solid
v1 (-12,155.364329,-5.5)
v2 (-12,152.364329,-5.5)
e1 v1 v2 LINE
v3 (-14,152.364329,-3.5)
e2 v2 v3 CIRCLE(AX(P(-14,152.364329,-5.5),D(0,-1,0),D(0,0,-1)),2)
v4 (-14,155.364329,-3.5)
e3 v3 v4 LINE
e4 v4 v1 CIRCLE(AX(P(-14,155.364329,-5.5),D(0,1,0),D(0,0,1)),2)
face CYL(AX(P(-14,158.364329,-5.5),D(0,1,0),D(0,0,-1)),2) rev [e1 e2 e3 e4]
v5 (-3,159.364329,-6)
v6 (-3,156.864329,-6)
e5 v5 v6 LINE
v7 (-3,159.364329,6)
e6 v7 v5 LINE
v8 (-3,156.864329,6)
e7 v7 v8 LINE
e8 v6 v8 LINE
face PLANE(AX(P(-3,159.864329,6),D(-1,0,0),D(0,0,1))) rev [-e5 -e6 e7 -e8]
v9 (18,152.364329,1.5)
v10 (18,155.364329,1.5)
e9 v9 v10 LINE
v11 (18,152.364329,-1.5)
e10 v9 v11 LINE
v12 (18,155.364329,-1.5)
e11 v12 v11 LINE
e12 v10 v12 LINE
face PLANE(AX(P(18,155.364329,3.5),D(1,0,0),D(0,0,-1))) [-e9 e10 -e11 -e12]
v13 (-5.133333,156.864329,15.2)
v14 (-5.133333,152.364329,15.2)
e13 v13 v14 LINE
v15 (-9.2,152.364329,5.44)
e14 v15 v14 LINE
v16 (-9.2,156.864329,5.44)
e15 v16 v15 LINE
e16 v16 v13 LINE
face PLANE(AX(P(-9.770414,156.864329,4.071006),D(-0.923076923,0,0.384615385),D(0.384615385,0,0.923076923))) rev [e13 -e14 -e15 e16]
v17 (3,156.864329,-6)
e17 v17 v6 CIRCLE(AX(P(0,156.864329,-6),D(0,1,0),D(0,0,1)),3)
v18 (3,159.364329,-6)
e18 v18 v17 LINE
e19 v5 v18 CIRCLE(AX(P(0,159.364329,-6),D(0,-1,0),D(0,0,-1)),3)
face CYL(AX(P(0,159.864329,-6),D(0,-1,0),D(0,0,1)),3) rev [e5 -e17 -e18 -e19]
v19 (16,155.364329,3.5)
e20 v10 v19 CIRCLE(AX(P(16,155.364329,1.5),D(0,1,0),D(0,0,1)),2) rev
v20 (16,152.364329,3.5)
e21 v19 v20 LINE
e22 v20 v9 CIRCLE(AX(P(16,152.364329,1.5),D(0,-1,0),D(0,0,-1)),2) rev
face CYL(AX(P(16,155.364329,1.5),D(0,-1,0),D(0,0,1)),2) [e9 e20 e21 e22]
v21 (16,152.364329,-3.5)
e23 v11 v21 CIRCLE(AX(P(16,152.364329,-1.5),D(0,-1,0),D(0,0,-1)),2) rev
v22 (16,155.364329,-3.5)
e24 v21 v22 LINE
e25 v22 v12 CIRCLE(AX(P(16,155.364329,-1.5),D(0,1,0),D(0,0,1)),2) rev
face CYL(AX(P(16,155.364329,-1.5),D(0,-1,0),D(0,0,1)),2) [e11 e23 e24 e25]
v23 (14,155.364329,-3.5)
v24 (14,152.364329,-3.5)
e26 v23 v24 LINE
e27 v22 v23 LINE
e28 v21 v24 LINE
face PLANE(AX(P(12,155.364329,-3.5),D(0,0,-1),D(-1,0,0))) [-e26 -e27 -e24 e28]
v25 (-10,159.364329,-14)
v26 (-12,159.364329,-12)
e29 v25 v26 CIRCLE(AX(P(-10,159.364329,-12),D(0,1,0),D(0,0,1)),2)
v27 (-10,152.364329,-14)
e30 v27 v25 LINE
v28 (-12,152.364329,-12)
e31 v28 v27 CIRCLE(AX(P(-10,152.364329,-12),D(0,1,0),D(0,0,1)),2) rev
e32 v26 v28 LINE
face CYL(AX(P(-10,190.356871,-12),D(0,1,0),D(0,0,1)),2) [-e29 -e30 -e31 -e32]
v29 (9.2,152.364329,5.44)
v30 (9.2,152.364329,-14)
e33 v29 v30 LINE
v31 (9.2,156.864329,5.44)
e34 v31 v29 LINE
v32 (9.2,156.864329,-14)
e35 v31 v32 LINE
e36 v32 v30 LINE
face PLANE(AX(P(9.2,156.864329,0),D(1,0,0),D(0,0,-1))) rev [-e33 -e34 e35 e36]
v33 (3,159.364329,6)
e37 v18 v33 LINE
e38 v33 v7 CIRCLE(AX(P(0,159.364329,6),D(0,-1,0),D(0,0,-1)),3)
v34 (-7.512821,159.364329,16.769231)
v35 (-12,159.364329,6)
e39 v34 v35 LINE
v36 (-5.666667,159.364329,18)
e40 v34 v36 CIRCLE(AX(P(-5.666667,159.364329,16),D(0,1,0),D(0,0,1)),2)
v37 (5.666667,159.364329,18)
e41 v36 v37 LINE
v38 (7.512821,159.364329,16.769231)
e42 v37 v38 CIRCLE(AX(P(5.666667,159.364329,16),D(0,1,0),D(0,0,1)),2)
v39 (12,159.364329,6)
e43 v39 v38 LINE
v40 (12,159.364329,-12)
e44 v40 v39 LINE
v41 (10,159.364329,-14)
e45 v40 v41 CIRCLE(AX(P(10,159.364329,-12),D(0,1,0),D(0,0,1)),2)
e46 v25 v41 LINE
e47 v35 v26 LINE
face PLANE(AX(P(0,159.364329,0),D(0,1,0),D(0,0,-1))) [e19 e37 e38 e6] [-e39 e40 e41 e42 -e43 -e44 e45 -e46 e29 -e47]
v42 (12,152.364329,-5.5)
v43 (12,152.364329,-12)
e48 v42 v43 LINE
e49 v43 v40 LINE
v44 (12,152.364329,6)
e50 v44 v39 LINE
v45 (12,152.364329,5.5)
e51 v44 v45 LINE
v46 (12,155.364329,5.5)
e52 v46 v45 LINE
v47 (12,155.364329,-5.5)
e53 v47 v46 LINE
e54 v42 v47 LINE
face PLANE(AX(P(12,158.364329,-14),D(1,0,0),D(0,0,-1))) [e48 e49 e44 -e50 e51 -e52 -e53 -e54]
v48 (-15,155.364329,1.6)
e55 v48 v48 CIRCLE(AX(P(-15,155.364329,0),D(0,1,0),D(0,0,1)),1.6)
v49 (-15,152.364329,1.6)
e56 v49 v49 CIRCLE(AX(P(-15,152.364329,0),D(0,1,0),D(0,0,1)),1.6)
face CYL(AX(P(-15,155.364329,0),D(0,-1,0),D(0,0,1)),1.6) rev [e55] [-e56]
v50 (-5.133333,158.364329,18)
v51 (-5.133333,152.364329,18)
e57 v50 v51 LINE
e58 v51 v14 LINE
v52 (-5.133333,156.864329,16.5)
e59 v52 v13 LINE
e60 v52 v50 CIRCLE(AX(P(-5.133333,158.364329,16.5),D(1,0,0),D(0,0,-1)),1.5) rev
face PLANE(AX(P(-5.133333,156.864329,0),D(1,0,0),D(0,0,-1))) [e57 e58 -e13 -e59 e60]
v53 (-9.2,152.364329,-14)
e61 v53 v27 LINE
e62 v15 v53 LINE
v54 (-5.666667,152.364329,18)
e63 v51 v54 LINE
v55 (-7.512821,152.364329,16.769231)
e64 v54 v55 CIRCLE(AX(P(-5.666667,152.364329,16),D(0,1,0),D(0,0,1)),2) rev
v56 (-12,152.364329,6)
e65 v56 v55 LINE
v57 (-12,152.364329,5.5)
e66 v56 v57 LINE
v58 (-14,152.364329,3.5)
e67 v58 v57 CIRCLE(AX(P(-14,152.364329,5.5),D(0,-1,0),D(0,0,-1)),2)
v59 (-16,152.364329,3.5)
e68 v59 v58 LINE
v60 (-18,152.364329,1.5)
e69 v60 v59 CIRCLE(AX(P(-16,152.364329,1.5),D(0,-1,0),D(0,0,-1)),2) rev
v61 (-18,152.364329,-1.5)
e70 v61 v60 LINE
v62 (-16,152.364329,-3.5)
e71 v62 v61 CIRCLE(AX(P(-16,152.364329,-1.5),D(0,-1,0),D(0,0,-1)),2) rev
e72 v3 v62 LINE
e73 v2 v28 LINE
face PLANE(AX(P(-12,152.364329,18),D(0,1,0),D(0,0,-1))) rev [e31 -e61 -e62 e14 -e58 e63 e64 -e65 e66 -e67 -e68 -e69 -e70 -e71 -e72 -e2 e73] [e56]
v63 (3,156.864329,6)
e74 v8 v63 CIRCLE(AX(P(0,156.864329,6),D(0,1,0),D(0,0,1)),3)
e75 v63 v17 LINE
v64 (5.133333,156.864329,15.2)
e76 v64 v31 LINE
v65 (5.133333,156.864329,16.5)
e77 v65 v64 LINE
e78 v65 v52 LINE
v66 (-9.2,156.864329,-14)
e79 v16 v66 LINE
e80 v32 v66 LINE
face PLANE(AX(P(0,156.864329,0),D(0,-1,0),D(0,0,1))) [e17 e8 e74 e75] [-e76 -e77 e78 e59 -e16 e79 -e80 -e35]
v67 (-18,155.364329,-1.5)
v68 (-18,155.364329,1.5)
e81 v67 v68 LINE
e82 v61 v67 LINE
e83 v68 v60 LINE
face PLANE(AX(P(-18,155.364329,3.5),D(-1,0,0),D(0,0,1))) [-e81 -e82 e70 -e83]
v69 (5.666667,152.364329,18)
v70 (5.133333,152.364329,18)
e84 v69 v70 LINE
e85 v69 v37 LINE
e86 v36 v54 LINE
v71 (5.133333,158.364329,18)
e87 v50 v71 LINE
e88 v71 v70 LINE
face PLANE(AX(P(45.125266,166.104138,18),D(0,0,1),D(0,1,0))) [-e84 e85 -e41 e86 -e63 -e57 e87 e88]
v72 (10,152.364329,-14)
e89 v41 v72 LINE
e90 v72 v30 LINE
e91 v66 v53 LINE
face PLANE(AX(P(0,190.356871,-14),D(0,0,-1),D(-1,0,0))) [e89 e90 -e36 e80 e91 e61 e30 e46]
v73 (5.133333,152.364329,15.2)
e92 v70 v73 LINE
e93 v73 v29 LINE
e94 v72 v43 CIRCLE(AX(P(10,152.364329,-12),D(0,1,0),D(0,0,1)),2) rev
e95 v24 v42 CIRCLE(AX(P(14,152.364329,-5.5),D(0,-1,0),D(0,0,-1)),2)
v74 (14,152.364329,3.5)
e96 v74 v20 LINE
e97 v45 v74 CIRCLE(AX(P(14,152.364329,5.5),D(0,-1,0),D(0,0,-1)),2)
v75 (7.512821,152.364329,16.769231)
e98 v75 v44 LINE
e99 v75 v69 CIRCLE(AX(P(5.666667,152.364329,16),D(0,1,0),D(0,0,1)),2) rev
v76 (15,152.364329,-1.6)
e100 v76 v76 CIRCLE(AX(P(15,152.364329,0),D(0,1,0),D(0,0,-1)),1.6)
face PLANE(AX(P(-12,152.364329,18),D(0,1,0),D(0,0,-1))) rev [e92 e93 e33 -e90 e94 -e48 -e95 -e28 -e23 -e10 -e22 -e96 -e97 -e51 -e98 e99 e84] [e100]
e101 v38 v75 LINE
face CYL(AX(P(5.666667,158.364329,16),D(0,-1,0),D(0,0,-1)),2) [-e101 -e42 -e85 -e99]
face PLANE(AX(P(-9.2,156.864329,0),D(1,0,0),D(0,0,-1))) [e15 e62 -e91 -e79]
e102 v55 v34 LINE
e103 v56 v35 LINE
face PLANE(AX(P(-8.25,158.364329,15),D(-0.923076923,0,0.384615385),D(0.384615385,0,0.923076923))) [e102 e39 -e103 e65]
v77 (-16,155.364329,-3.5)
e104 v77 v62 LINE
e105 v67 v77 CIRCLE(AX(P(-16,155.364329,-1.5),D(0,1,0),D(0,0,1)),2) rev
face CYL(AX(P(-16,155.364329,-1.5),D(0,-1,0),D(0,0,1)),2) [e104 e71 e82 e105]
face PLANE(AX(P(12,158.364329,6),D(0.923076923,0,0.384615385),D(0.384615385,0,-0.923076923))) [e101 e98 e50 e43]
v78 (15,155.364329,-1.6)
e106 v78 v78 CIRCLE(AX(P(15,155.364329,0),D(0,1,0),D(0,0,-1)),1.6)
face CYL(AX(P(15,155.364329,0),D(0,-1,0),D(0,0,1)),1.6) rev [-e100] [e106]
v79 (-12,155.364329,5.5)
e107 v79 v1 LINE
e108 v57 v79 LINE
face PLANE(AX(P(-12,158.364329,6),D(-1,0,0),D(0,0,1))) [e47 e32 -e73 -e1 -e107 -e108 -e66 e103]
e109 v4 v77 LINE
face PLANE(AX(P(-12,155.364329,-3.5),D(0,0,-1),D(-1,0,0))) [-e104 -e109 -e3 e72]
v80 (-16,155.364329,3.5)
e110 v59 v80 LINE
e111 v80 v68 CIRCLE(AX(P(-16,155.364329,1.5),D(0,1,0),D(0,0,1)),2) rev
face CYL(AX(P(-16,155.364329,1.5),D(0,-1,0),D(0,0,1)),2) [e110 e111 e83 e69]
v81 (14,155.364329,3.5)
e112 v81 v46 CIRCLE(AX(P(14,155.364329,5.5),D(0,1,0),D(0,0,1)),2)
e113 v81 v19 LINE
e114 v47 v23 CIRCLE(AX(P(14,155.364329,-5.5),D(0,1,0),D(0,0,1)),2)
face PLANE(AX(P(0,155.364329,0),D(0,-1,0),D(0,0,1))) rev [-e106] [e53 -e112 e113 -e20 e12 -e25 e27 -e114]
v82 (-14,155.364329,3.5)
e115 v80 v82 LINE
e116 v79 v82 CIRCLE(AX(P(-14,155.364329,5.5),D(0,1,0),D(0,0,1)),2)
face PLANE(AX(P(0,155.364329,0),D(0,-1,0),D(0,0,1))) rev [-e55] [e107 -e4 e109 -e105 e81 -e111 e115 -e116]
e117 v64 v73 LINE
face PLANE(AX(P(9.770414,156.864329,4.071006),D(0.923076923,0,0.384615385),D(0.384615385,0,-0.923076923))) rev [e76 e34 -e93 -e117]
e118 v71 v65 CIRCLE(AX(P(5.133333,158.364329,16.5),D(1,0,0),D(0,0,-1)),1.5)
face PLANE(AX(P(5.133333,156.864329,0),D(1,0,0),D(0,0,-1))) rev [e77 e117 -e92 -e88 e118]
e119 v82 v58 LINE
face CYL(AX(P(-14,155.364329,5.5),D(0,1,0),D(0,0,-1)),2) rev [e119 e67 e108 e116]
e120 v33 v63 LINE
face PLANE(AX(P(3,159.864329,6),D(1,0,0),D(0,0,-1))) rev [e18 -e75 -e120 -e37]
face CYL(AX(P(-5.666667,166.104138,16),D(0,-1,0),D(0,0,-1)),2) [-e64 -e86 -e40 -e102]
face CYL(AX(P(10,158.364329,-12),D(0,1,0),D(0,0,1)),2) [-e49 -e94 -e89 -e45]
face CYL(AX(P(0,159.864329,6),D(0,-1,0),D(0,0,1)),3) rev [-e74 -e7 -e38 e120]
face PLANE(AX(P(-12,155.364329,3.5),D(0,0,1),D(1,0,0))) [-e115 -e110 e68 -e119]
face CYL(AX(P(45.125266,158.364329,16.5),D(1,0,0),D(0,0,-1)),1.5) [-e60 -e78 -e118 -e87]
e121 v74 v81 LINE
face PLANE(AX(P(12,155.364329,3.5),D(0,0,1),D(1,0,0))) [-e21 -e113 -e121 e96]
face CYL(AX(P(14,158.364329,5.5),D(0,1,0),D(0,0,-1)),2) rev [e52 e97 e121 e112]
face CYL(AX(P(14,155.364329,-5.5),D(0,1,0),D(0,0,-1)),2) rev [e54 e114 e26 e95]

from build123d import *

# Parameters (mm, degrees)
EXTRUDE_1_DEPTH      = 3
SKETCH_7_R           = 1.75
SKETCH_7_R_2         = 2.25
CUT_EXTRUDE_2_DEPTH  = 143.955430949
CUT_EXTRUDE_4_DEPTH  = 3
CUT_EXTRUDE_5_DEPTH  = 3
CUT_EXTRUDE_8_DEPTH  = 3
SKETCH_12_R          = 1.7
CUT_EXTRUDE_9_DEPTH  = 3
SKETCH_13_R          = 1.7
CUT_EXTRUDE_11_DEPTH = 3
CUT_EXTRUDE_12_DEPTH = 143.955430949
FILLET_1_R           = 2
FILLET_2_R           = 2
CUT_EXTRUDE_13_DEPTH = 143.955430949
CUT_EXTRUDE_15_DEPTH = 143.955430949
CUT_EXTRUDE_16_DEPTH = 143.955430949
SKETCH_20_W          = 133.80338819
SKETCH_20_H          = 42.989432067
EXTRUDE_2_DEPTH      = 3
SKETCH_21_W          = 129.207272524
SKETCH_21_H          = 38.788932745
EXTRUDE_3_DEPTH      = 3
SKETCH_22_W          = 20.868569364
SKETCH_22_H          = 31.210515244
SKETCH_22_W_2        = 21.053246969
SKETCH_22_H_2        = 30.102449614
EXTRUDE_4_DEPTH      = 3
SKETCH_24_W          = 36.300662223
SKETCH_24_H          = 5.953308604
SKETCH_24_W_2        = 36.591067521
EXTRUDE_5_DEPTH      = 3
CUT_EXTRUDE_17_DEPTH = 143.955430949
CUT_EXTRUDE_19_DEPTH = 143.955430949
CUT_EXTRUDE_20_DEPTH = 143.955430949
CUT_EXTRUDE_21_DEPTH = 143.955430949
CUT_EXTRUDE_22_DEPTH = 143.955430949
CUT_EXTRUDE_23_DEPTH = 3
SKETCH_30_R          = 1.7
SKETCH_30_R_2        = 3.5
EXTRUDE_6_DEPTH      = 4
EXTRUDE_7_DEPTH      = 24
CUT_EXTRUDE_26_DEPTH = 31.5
EXTRUDE_8_DEPTH      = 10
EXTRUDE_9_DEPTH      = 1
CUT_EXTRUDE_27_DEPTH = 10
SKETCH_38_W          = 3
SKETCH_38_H          = 1
CUT_EXTRUDE_28_DEPTH = 166.273761152
CUT_EXTRUDE_29_DEPTH = 21
EXTRUDE_11_DEPTH     = 7
CUT_EXTRUDE_30_DEPTH = 5.5
EXTRUDE_12_DEPTH     = 3
CUT_EXTRUDE_31_DEPTH = 23
FILLET_4_R           = 0.7
FILLET_5_R           = 1
FILLET_6_R           = 1.2
CUT_EXTRUDE_32_DEPTH = 3
SKETCH_47_W          = 24
SKETCH_47_H          = 1
CUT_EXTRUDE_33_DEPTH = 167.672697425
SKETCH_48_W          = 6
SKETCH_48_H          = 7
SKETCH_48_R          = 1.6
EXTRUDE_13_DEPTH     = 3
FILLET_7_R           = 2
SKETCH_49_W          = 40.518885993
SKETCH_49_H          = 45.885701136
CUT_EXTRUDE_34_DEPTH = 33
FILLET_8_R           = 2
FILLET_9_R           = 2
FILLET_10_R          = 2
FILLET_11_R          = 2
FILLET_12_R          = 1.5
FILLET_13_R          = 1.5
SKETCH_51_W          = 46.608599542
SKETCH_51_H          = 55.034000229
CUT_EXTRUDE_36_DEPTH = 40


# Read off the part's stored shape, not the designer's step: 切除-拉伸35
with BuildPart() as part:
    # 草图1 → 凸台-拉伸1 (new body)
    # profile 1 of 14: a face of its own
    with BuildSketch(Plane.XY):
        with BuildLine():
            Line((60, 106.603296002), (35.889163634, 121.664519159))
            Line((35.889163634, 121.664519159), (-35.889163634, 121.664519159))
            Line((-35.889163634, 121.664519159), (-60, 106.603296002))
            Line((-60, 106.603296002), (-60, 94.801892265))
            Line((-60, 94.801892265), (-45, 94.801892265))
            ThreePointArc((-45, 94.801892265), (-43.762563133, 94.289329132), (-43.25, 93.051892265))
            Line((-43.25, 93.051892265), (-37.75, 93.051892265))
            ThreePointArc((-37.75, 93.051892265), (-37.237436867, 94.289329132), (-36, 94.801892265))
            Line((-36, 94.801892265), (-21, 94.801892265))
            ThreePointArc((-21, 94.801892265), (-19.762563133, 94.289329132), (-19.25, 93.051892265))
            Line((-19.25, 93.051892265), (19.25, 93.051892265))
            ThreePointArc((19.25, 93.051892265), (19.762563133, 94.289329132), (21, 94.801892265))
            Line((21, 94.801892265), (36, 94.801892265))
            ThreePointArc((36, 94.801892265), (37.237436867, 94.289329132), (37.75, 93.051892265))
            Line((37.75, 93.051892265), (43.25, 93.051892265))
            ThreePointArc((43.25, 93.051892265), (43.762563133, 94.289329132), (45, 94.801892265))
            Line((45, 94.801892265), (60, 94.801892265))
            Line((60, 94.801892265), (60, 106.603296002))
        make_face()
    # profile 2 of 14: a face of its own
    with BuildSketch(Plane.XY):
        with BuildLine():
            Line((66.901694095, 102.292041372), (60, 106.603296002))
            Line((60, 106.603296002), (60, 94.801892265))
            ThreePointArc((60, 94.801892265), (61.237436867, 94.289329132), (61.75, 93.051892265))
            Line((61.75, 93.051892265), (66.901694095, 93.051892265))
            Line((66.901694095, 93.051892265), (66.901694095, 102.292041372))
        make_face()
    # profile 3 of 14: a face of its own
    with BuildSketch(Plane.XY):
        with BuildLine():
            Line((-60, 94.801892265), (-60, 106.603296002))
            Line((-60, 106.603296002), (-66.901694095, 102.292041372))
            Line((-66.901694095, 102.292041372), (-66.901694095, 93.051892265))
            Line((-66.901694095, 93.051892265), (-61.75, 93.051892265))
            ThreePointArc((-61.75, 93.051892265), (-61.237436867, 94.289329132), (-60, 94.801892265))
        make_face()
    # profile 4 of 14: a face of its own
    with BuildSketch(Plane.XY):
        with BuildLine():
            Line((66.901694095, 63.051892265), (66.901694095, 93.051892265))
            Line((66.901694095, 93.051892265), (61.75, 93.051892265))
            ThreePointArc((61.75, 93.051892265), (61.237436867, 91.814455398), (60, 91.301892265))
            Line((60, 91.301892265), (60, 64.801892265))
            ThreePointArc((60, 64.801892265), (61.237436867, 64.289329132), (61.75, 63.051892265))
            Line((61.75, 63.051892265), (66.901694095, 63.051892265))
        make_face()
    # profile 5 of 14: a face of its own
    with BuildSketch(Plane.XY):
        with BuildLine():
            Line((-61.75, 93.051892265), (-66.901694095, 93.051892265))
            Line((-66.901694095, 93.051892265), (-66.901694095, 63.051892265))
            Line((-66.901694095, 63.051892265), (-61.75, 63.051892265))
            ThreePointArc((-61.75, 63.051892265), (-61.237436867, 64.289329132), (-60, 64.801892265))
            Line((-60, 64.801892265), (-60, 91.301892265))
            ThreePointArc((-60, 91.301892265), (-61.237436867, 91.814455398), (-61.75, 93.051892265))
        make_face()
    # profile 6 of 14: a face of its own
    with BuildSketch(Plane.XY):
        with BuildLine():
            Line((66.901694095, 52.870133869), (66.901694095, 63.051892265))
            Line((66.901694095, 63.051892265), (61.75, 63.051892265))
            ThreePointArc((61.75, 63.051892265), (61.237436867, 61.814455398), (60, 61.301892265))
            Line((60, 61.301892265), (60, 31.261343001))
            Line((60, 31.261343001), (75, 31.261343001))
            Line((75, 31.261343001), (75, 40.933889795))
            ThreePointArc((75, 40.933889795), (69.117351927, 45.658052319), (66.901694095, 52.870133869))
        make_face()
    # profile 7 of 14: a face of its own
    with BuildSketch(Plane.XY):
        with BuildLine():
            Line((60, 64.801892265), (60, 91.301892265))
            Line((60, 91.301892265), (45, 91.301892265))
            ThreePointArc((45, 91.301892265), (43.762563133, 91.814455398), (43.25, 93.051892265))
            Line((43.25, 93.051892265), (37.75, 93.051892265))
            ThreePointArc((37.75, 93.051892265), (37.237436867, 91.814455398), (36, 91.301892265))
            Line((36, 91.301892265), (21, 91.301892265))
            ThreePointArc((21, 91.301892265), (19.762563133, 91.814455398), (19.25, 93.051892265))
            Line((19.25, 93.051892265), (-19.25, 93.051892265))
            ThreePointArc((-19.25, 93.051892265), (-19.762563133, 91.814455398), (-21, 91.301892265))
            Line((-21, 91.301892265), (-36, 91.301892265))
            ThreePointArc((-36, 91.301892265), (-37.237436867, 91.814455398), (-37.75, 93.051892265))
            Line((-37.75, 93.051892265), (-43.25, 93.051892265))
            ThreePointArc((-43.25, 93.051892265), (-43.762563133, 91.814455398), (-45, 91.301892265))
            Line((-45, 91.301892265), (-60, 91.301892265))
            Line((-60, 91.301892265), (-60, 64.801892265))
            Line((-60, 64.801892265), (-45, 64.801892265))
            ThreePointArc((-45, 64.801892265), (-43.762563133, 64.289329132), (-43.25, 63.051892265))
            Line((-43.25, 63.051892265), (-37.75, 63.051892265))
            ThreePointArc((-37.75, 63.051892265), (-37.237436867, 64.289329132), (-36, 64.801892265))
            Line((-36, 64.801892265), (-21, 64.801892265))
            ThreePointArc((-21, 64.801892265), (-19.762563133, 64.289329132), (-19.25, 63.051892265))
            Line((-19.25, 63.051892265), (19.25, 63.051892265))
            ThreePointArc((19.25, 63.051892265), (19.762563133, 64.289329132), (21, 64.801892265))
            Line((21, 64.801892265), (36, 64.801892265))
            ThreePointArc((36, 64.801892265), (37.237436867, 64.289329132), (37.75, 63.051892265))
            Line((37.75, 63.051892265), (43.25, 63.051892265))
            ThreePointArc((43.25, 63.051892265), (43.762563133, 64.289329132), (45, 64.801892265))
            Line((45, 64.801892265), (60, 64.801892265))
        make_face()
    # profile 8 of 14: a face of its own
    with BuildSketch(Plane.XY):
        with BuildLine():
            Line((-61.75, 63.051892265), (-66.901694095, 63.051892265))
            Line((-66.901694095, 63.051892265), (-66.901694095, 52.870133869))
            ThreePointArc((-66.901694095, 52.870133869), (-69.117351927, 45.658052319), (-75, 40.933889795))
            Line((-75, 40.933889795), (-75, 31.261343001))
            Line((-75, 31.261343001), (-60, 31.261343001))
            Line((-60, 31.261343001), (-60, 61.301892265))
            ThreePointArc((-60, 61.301892265), (-61.237436867, 61.814455398), (-61.75, 63.051892265))
        make_face()
    # profile 9 of 14: a face of its own
    with BuildSketch(Plane.XY):
        with BuildLine():
            Line((60, 31.261343001), (60, 61.301892265))
            Line((60, 61.301892265), (45, 61.301892265))
            ThreePointArc((45, 61.301892265), (43.762563133, 61.814455398), (43.25, 63.051892265))
            Line((43.25, 63.051892265), (37.75, 63.051892265))
            ThreePointArc((37.75, 63.051892265), (37.237436867, 61.814455398), (36, 61.301892265))
            Line((36, 61.301892265), (21, 61.301892265))
            ThreePointArc((21, 61.301892265), (19.762563133, 61.814455398), (19.25, 63.051892265))
            Line((19.25, 63.051892265), (-19.25, 63.051892265))
            ThreePointArc((-19.25, 63.051892265), (-19.762563133, 61.814455398), (-21, 61.301892265))
            Line((-21, 61.301892265), (-36, 61.301892265))
            ThreePointArc((-36, 61.301892265), (-37.237436867, 61.814455398), (-37.75, 63.051892265))
            Line((-37.75, 63.051892265), (-43.25, 63.051892265))
            ThreePointArc((-43.25, 63.051892265), (-43.762563133, 61.814455398), (-45, 61.301892265))
            Line((-45, 61.301892265), (-60, 61.301892265))
            Line((-60, 61.301892265), (-60, 31.261343001))
            Line((-60, 31.261343001), (60, 31.261343001))
        make_face()
    # profile 10 of 14: a face of its own
    with BuildSketch(Plane.XY):
        with BuildLine():
            Line((60, -58.312864289), (60, 23.940028391))
            Line((60, 23.940028391), (-60, 23.940028391))
            Line((-60, 23.940028391), (-60, -58.312864289))
            Line((-60, -58.312864289), (-45, -58.312864289))
            ThreePointArc((-45, -58.312864289), (-43.25, -60.062864289), (-45, -61.812864289))
            Line((-45, -61.812864289), (-60, -61.812864289))
            Line((-60, -61.812864289), (-60, -88.312864289))
            Line((-60, -88.312864289), (-45, -88.312864289))
            ThreePointArc((-45, -88.312864289), (-43.25, -90.062864289), (-45, -91.812864289))
            Line((-45, -91.812864289), (-60, -91.812864289))
            Line((-60, -91.812864289), (-60, -111.849967256))
            Line((-60, -111.849967256), (-38.845469114, -105.590576733))
            ThreePointArc((-38.845469114, -105.590576733), (-36.037784492, -104.975210108), (-33.17088573, -104.768665882))
            Line((-33.17088573, -104.768665882), (33.17088573, -104.768665882))
            ThreePointArc((33.17088573, -104.768665882), (36.037784492, -104.975210108), (38.845469114, -105.590576733))
            Line((38.845469114, -105.590576733), (60, -111.849967256))
            Line((60, -111.849967256), (60, -91.812864289))
            Line((60, -91.812864289), (45, -91.812864289))
            ThreePointArc((45, -91.812864289), (43.762563133, -91.300301156), (43.25, -90.062864289))
            ThreePointArc((43.25, -90.062864289), (43.762563133, -88.825427422), (45, -88.312864289))
            Line((45, -88.312864289), (60, -88.312864289))
            Line((60, -88.312864289), (60, -61.812864289))
            Line((60, -61.812864289), (45, -61.812864289))
            ThreePointArc((45, -61.812864289), (43.762563133, -61.300301156), (43.25, -60.062864289))
            ThreePointArc((43.25, -60.062864289), (43.762563133, -58.825427422), (45, -58.312864289))
            Line((45, -58.312864289), (60, -58.312864289))
        make_face()
        with BuildLine():
            ThreePointArc((-21, -88.312864289), (-19.762563133, -88.825427422), (-19.25, -90.062864289))
            ThreePointArc((-19.25, -90.062864289), (-19.762563133, -91.300301156), (-21, -91.812864289))
            Line((-21, -91.812864289), (-36, -91.812864289))
            ThreePointArc((-36, -91.812864289), (-37.75, -90.062864289), (-36, -88.312864289))
            Line((-36, -88.312864289), (-21, -88.312864289))
        make_face(mode=Mode.SUBTRACT)
        with BuildLine():
            ThreePointArc((-21, -58.312864289), (-19.762563133, -58.825427422), (-19.25, -60.062864289))
            ThreePointArc((-19.25, -60.062864289), (-19.762563133, -61.300301156), (-21, -61.812864289))
            Line((-21, -61.812864289), (-36, -61.812864289))
            ThreePointArc((-36, -61.812864289), (-37.75, -60.062864289), (-36, -58.312864289))
            Line((-36, -58.312864289), (-21, -58.312864289))
        make_face(mode=Mode.SUBTRACT)
        with BuildLine():
            ThreePointArc((36, -88.312864289), (37.237436867, -88.825427422), (37.75, -90.062864289))
            ThreePointArc((37.75, -90.062864289), (37.237436867, -91.300301156), (36, -91.812864289))
            Line((36, -91.812864289), (21, -91.812864289))
            ThreePointArc((21, -91.812864289), (19.762563133, -91.300301156), (19.25, -90.062864289))
            ThreePointArc((19.25, -90.062864289), (19.762563133, -88.825427422), (21, -88.312864289))
            Line((21, -88.312864289), (36, -88.312864289))
        make_face(mode=Mode.SUBTRACT)
        with BuildLine():
            ThreePointArc((36, -58.312864289), (37.237436867, -58.825427422), (37.75, -60.062864289))
            ThreePointArc((37.75, -60.062864289), (37.237436867, -61.300301156), (36, -61.812864289))
            Line((36, -61.812864289), (21, -61.812864289))
            ThreePointArc((21, -61.812864289), (19.762563133, -61.300301156), (19.25, -60.062864289))
            ThreePointArc((19.25, -60.062864289), (19.762563133, -58.825427422), (21, -58.312864289))
            Line((21, -58.312864289), (36, -58.312864289))
        make_face(mode=Mode.SUBTRACT)
    # profile 11 of 14: a face of its own
    with BuildSketch(Plane.XY):
        with BuildLine():
            Line((75, 23.940028391), (60, 23.940028391))
            Line((60, 23.940028391), (60, -58.312864289))
            ThreePointArc((60, -58.312864289), (61.237436867, -58.825427422), (61.75, -60.062864289))
            Line((61.75, -60.062864289), (67.402721334, -60.062864289))
            add(Edge.make_bspline(
                [(75, 10.562559835), (72.695878257, 1.907314233), (70.339582535, -13.372796253), (67.818206704, -36.939032951), (67.208860388, -51.77269444), (67.402721334, -60.062864289)],
                knots=[0, 0, 0, 0, 0.235246678, 0.40629419, 0.624108181, 0.624108181, 0.624108181, 0.624108181], degree=3))
            Line((75, 10.562559835), (75, 23.940028391))
        make_face()
    # profile 12 of 14: a face of its own
    with BuildSketch(Plane.XY):
        with BuildLine():
            Line((-60, -58.312864289), (-60, 23.940028391))
            Line((-60, 23.940028391), (-75, 23.940028391))
            Line((-75, 23.940028391), (-75, 10.562559835))
            add(Edge.make_bspline(
                [(-75, 10.562559835), (-72.695878257, 1.907314233), (-70.339582535, -13.372796253), (-67.818206704, -36.939032951), (-67.208860388, -51.77269444), (-67.402721334, -60.062864289)],
                knots=[0, 0, 0, 0, 0.235246678, 0.40629419, 0.624108181, 0.624108181, 0.624108181, 0.624108181], degree=3))
            add(Edge.make_bspline(
                [(-67.402721334, -60.062864289), (-67.560325872, -66.802583754), (-68.323504015, -76.843670093), (-70.154131955, -86.778530076), (-70.533712858, -90.062864289)],
                knots=[0.624108181, 0.624108181, 0.624108181, 0.624108181, 0.801186001, 0.888408652, 0.888408652, 0.888408652, 0.888408652], degree=3))
            add(Edge.make_bspline(
                [(-70.533712858, -90.062864289), (-71.019342956, -94.264792095), (-71.137422935, -98.476048206), (-70.1742624, -102.732794059)],
                knots=[0.888408652, 0.888408652, 0.888408652, 0.888408652, 1, 1, 1, 1], degree=3))
            Line((-70.1742624, -102.732794059), (-66.460817635, -113.761651372))
            Line((-66.460817635, -113.761651372), (-60, -111.849967256))
            Line((-60, -111.849967256), (-60, -91.812864289))
            ThreePointArc((-60, -91.812864289), (-61.75, -90.062864289), (-60, -88.312864289))
            Line((-60, -88.312864289), (-60, -61.812864289))
            ThreePointArc((-60, -61.812864289), (-61.75, -60.062864289), (-60, -58.312864289))
        make_face()
    # profile 13 of 14: a face of its own
    with BuildSketch(Plane.XY):
        with BuildLine():
            Line((67.402721334, -60.062864289), (61.75, -60.062864289))
            ThreePointArc((61.75, -60.062864289), (61.237436867, -61.300301156), (60, -61.812864289))
            Line((60, -61.812864289), (60, -88.312864289))
            ThreePointArc((60, -88.312864289), (61.237436867, -88.825427422), (61.75, -90.062864289))
            Line((61.75, -90.062864289), (70.533712858, -90.062864289))
            add(Edge.make_bspline(
                [(67.402721334, -60.062864289), (67.560325872, -66.802583754), (68.323504015, -76.843670093), (70.154131955, -86.778530076), (70.533712858, -90.062864289)],
                knots=[0.624108181, 0.624108181, 0.624108181, 0.624108181, 0.801186001, 0.888408652, 0.888408652, 0.888408652, 0.888408652], degree=3))
        make_face()
    # profile 14 of 14: a face of its own
    with BuildSketch(Plane.XY):
        with BuildLine():
            add(Edge.make_bspline(
                [(70.533712858, -90.062864289), (71.019342956, -94.264792095), (71.137422935, -98.476048206), (70.1742624, -102.732794059)],
                knots=[0.888408652, 0.888408652, 0.888408652, 0.888408652, 1, 1, 1, 1], degree=3))
            Line((70.533712858, -90.062864289), (61.75, -90.062864289))
            ThreePointArc((61.75, -90.062864289), (61.237436867, -91.300301156), (60, -91.812864289))
            Line((60, -91.812864289), (60, -111.849967256))
            Line((60, -111.849967256), (66.460817635, -113.761651372))
            Line((66.460817635, -113.761651372), (70.1742624, -102.732794059))
        make_face()
    extrude(amount=EXTRUDE_1_DEPTH)

    # 草图7 → 切除-拉伸2 (cut, through all)
    with BuildSketch(Plane(origin=(0, 0, 0), x_dir=(-1, 0, 0), z_dir=(0, 0, -1))):
        with Locations((-21, 41.261343001)):
            Circle(SKETCH_7_R)
        with Locations((21, 41.261343001)):
            Circle(SKETCH_7_R)
        with Locations((-21, 13.940028391)):
            Circle(SKETCH_7_R_2)
        with Locations((21, 13.940028391)):
            Circle(SKETCH_7_R_2)
    extrude(amount=-CUT_EXTRUDE_2_DEPTH, mode=Mode.SUBTRACT)

    # 草图9 → 切除-拉伸4 (cut)
    with BuildSketch(Plane.XY.offset(3)):
        with BuildLine():
            Line((55, -100.49704609), (20, -100.49704609))
            ThreePointArc((20, -100.49704609), (18.25, -98.74704609), (20, -96.99704609))
            Line((20, -96.99704609), (55, -96.99704609))
            ThreePointArc((55, -96.99704609), (56.75, -98.74704609), (55, -100.49704609))
        make_face()
        with BuildLine():
            Line((-55, -96.99704609), (-20, -96.99704609))
            ThreePointArc((-20, -96.99704609), (-18.25, -98.74704609), (-20, -100.49704609))
            Line((-20, -100.49704609), (-55, -100.49704609))
            ThreePointArc((-55, -100.49704609), (-56.75, -98.74704609), (-55, -96.99704609))
        make_face()
    extrude(amount=-CUT_EXTRUDE_4_DEPTH, mode=Mode.SUBTRACT)

    # 草图10 → 切除-拉伸5 (cut)
    with BuildSketch(Plane.XY.offset(3)):
        with BuildLine():
            Line((12.5, -80.062864289), (-12.5, -80.062864289))
            ThreePointArc((-12.5, -80.062864289), (-17.5, -75.062864289), (-12.5, -70.062864289))
            Line((-12.5, -70.062864289), (12.5, -70.062864289))
            ThreePointArc((12.5, -70.062864289), (17.5, -75.062864289), (12.5, -80.062864289))
        make_face()
    extrude(amount=-CUT_EXTRUDE_5_DEPTH, mode=Mode.SUBTRACT)

    # 草图11 → 切除-拉伸8 (cut)
    with BuildSketch(Plane.XY.offset(3)):
        with BuildLine():
            Line((15, 73.051892265), (-15, 73.051892265))
            ThreePointArc((-15, 73.051892265), (-20, 78.051892265), (-15, 83.051892265))
            Line((-15, 83.051892265), (15, 83.051892265))
            ThreePointArc((15, 83.051892265), (20, 78.051892265), (15, 73.051892265))
        make_face()
    extrude(amount=-CUT_EXTRUDE_8_DEPTH, mode=Mode.SUBTRACT)

    # 草图12 → 切除-拉伸9 (cut)
    with BuildSketch(Plane.XY.offset(3)):
        with Locations((0, 114.371786435)):
            Circle(SKETCH_12_R)
        with Locations((0, 98.371786435)):
            Circle(SKETCH_12_R)
        with Locations((8, 106.371786435)):
            Circle(SKETCH_12_R)
        with Locations((-8, 106.371786435)):
            Circle(SKETCH_12_R)
    extrude(amount=-CUT_EXTRUDE_9_DEPTH, mode=Mode.SUBTRACT)

    # 草图13 → 切除-拉伸11 (cut)
    with BuildSketch(Plane.XY.offset(3)):
        with Locations((0, -84.415765086)):
            Circle(SKETCH_13_R)
        with Locations((8, -92.415765086)):
            Circle(SKETCH_13_R)
        with Locations((0, -100.415765086)):
            Circle(SKETCH_13_R)
        with Locations((-8, -92.415765086)):
            Circle(SKETCH_13_R)
    extrude(amount=-CUT_EXTRUDE_11_DEPTH, mode=Mode.SUBTRACT)

    # 草图14 → 切除-拉伸12 (cut, through all)
    with BuildSketch(Plane.XY.offset(3)):
        with BuildLine():
            Line((-55.475501567, 8.919687236), (-55.475501567, -46.080312764))
            ThreePointArc((-55.475501567, -46.080312764), (-57.225501567, -47.830312764), (-58.975501567, -46.080312764))
            Line((-58.975501567, -46.080312764), (-58.975501567, 8.919687236))
            ThreePointArc((-58.975501567, 8.919687236), (-57.225501567, 10.669687236), (-55.475501567, 8.919687236))
        make_face()
        with BuildLine():
            Line((58.975501567, 8.919687236), (58.975501567, -46.080312764))
            ThreePointArc((58.975501567, -46.080312764), (57.225501567, -47.830312764), (55.475501567, -46.080312764))
            Line((55.475501567, -46.080312764), (55.475501567, 8.919687236))
            ThreePointArc((55.475501567, 8.919687236), (57.225501567, 10.669687236), (58.975501567, 8.919687236))
        make_face()
    extrude(amount=-CUT_EXTRUDE_12_DEPTH, mode=Mode.SUBTRACT)

    # 圆角1
    fillet_1_edges = [part.edges().sort_by_distance(p)[0] for p in [
        (75, 31.261343001, 1.5),
        (-75, 31.261343001, 1.5),
    ]]
    fillet(fillet_1_edges, radius=FILLET_1_R)

    # 圆角2
    fillet_2_edges = [part.edges().sort_by_distance(p)[0] for p in [
        (-75, 23.940028391, 1.5),
        (75, 23.940028391, 1.5),
    ]]
    fillet(fillet_2_edges, radius=FILLET_2_R)

    # 草图15 → 切除-拉伸13 (cut, through all)
    with BuildSketch(Plane(origin=(0, 0, 0), x_dir=(-1, 0, 0), z_dir=(0, 0, -1))):
        with BuildLine():
            Line((-61.184216401, 102.403501276), (-34.774762862, 118.900592756))
            ThreePointArc((-34.774762862, 118.900592756), (-32.70788159, 118.423097411), (-33.185376934, 116.356216138))
            Line((-33.185376934, 116.356216138), (-59.594830473, 99.859124658))
            ThreePointArc((-59.594830473, 99.859124658), (-61.661711746, 100.336620003), (-61.184216401, 102.403501276))
        make_face()
        with BuildLine():
            Line((59.594830473, 99.859124658), (33.185376934, 116.356216138))
            ThreePointArc((33.185376934, 116.356216138), (32.70788159, 118.423097411), (34.774762862, 118.900592756))
            Line((34.774762862, 118.900592756), (61.184216401, 102.403501276))
            ThreePointArc((61.184216401, 102.403501276), (61.661711746, 100.336620003), (59.594830473, 99.859124658))
        make_face()
    extrude(amount=-CUT_EXTRUDE_13_DEPTH, mode=Mode.SUBTRACT)

    # 草图17 → 切除-拉伸15 (cut, through all)
    with BuildSketch(Plane(origin=(0, 0, 0), x_dir=(-1, 0, 0), z_dir=(0, 0, -1))):
        Polygon((-28.645414283, -8.118433382), (-34.644957411, -20.11751964), (-34.644957411, -29.946558382), (-37.580904049, -29.946558382), (-37.580904049, -20.11751964), (-43.580447177, -8.118433382), (-40.64450054, -8.118433382), (-36.176755657, -17.43687271), (-36.049105803, -17.43687271), (-31.58136092, -8.118433382), align=None)
    extrude(amount=-CUT_EXTRUDE_15_DEPTH, mode=Mode.SUBTRACT)

    # 草图18 → 切除-拉伸16 (cut, through all)
    with BuildSketch(Plane(origin=(0, 0, 0), x_dir=(-1, 0, 0), z_dir=(0, 0, -1))):
        Polygon((46.06697123, -29.087529791), (43.131024593, -29.087529791), (43.131024593, -18.875541487), (35.854982926, -18.875541487), (35.854982926, -29.087529791), (32.919036289, -29.087529791), (32.919036289, -7.259404791), (35.854982926, -7.259404791), (35.854982926, -16.450194265), (43.131024593, -16.450194265), (43.131024593, -7.259404791), (46.06697123, -7.259404791), align=None)
    extrude(amount=-CUT_EXTRUDE_16_DEPTH, mode=Mode.SUBTRACT)

    # 草图20 → 凸台-拉伸2 (add)
    with BuildSketch(Plane(origin=(0, 0, 0), x_dir=(-1, 0, 0), z_dir=(0, 0, -1))):
        with Locations((0, 74.364849902)):
            Rectangle(SKETCH_20_W, SKETCH_20_H)
    extrude(amount=-EXTRUDE_2_DEPTH)

    # 草图21 → 凸台-拉伸3 (add)
    with BuildSketch(Plane(origin=(0, 0, 0), x_dir=(-1, 0, 0), z_dir=(0, 0, -1))):
        with Locations((-0.162688936, -75.817262983)):
            Rectangle(SKETCH_21_W, SKETCH_21_H)
    extrude(amount=-EXTRUDE_3_DEPTH)

    # 草图22 → 凸台-拉伸4 (add)
    with BuildSketch(Plane(origin=(0, 0, 0), x_dir=(-1, 0, 0), z_dir=(0, 0, -1))):
        with Locations((-36.28455521, -18.718035035)):
            Rectangle(SKETCH_22_W, SKETCH_22_H)
        with Locations((39.340924035, -18.16400222)):
            Rectangle(SKETCH_22_W_2, SKETCH_22_H_2)
    extrude(amount=-EXTRUDE_4_DEPTH)

    # 草图24 → 凸台-拉伸5 (add)
    with BuildSketch(Plane(origin=(0, 0, 0), x_dir=(-1, 0, 0), z_dir=(0, 0, -1))):
        with Locations((-46.84572901, 41.350914957)):
            Rectangle(SKETCH_24_W, SKETCH_24_H)
        with Locations((47.53599277, 41.350914957)):
            Rectangle(SKETCH_24_W_2, SKETCH_24_H)
    extrude(amount=-EXTRUDE_5_DEPTH)

    # 草图25 → 切除-拉伸17 (cut, through all)
    with BuildSketch(Plane(origin=(0, 0, 0), x_dir=(-1, 0, 0), z_dir=(0, 0, -1))):
        with BuildLine():
            Line((-14.658238954, 113.011343001), (-32.658238954, 113.011343001))
            ThreePointArc((-32.658238954, 113.011343001), (-34.408238954, 111.261343001), (-32.658238954, 109.511343001))
            Line((-32.658238954, 109.511343001), (-14.658238954, 109.511343001))
            ThreePointArc((-14.658238954, 109.511343001), (-12.908238954, 111.261343001), (-14.658238954, 113.011343001))
        make_face()
        with BuildLine():
            Line((-20.999999982, 43.011343001), (-32.658238954, 43.011343001))
            ThreePointArc((-32.658238954, 43.011343001), (-34.408238954, 41.261343001), (-32.658238954, 39.511343001))
            Line((-32.658238954, 39.511343001), (-21, 39.511343001))
            ThreePointArc((-21, 39.511343001), (-22.75, 41.26134301), (-20.999999982, 43.011343001))
        make_face()
        with BuildLine():
            ThreePointArc((14.341761046, 113.011343001), (12.591761046, 111.261343001), (14.341761046, 109.511343001))
            Line((14.341761046, 109.511343001), (32.341761046, 109.511343001))
            ThreePointArc((32.341761046, 109.511343001), (34.091761046, 111.261343001), (32.341761046, 113.011343001))
            Line((32.341761046, 113.011343001), (14.341761046, 113.011343001))
        make_face()
        with BuildLine():
            Line((-14.658238954, 43.011343001), (-20.999999982, 43.011343001))
            ThreePointArc((-20.999999982, 43.011343001), (-19.25, 41.261342991), (-21, 39.511343001))
            Line((-21, 39.511343001), (-14.658238954, 39.511343001))
            ThreePointArc((-14.658238954, 39.511343001), (-12.908238954, 41.261343001), (-14.658238954, 43.011343001))
        make_face()
        with BuildLine():
            ThreePointArc((32.341761046, 39.511343001), (34.091761046, 41.261343001), (32.341761046, 43.011343001))
            Line((32.341761046, 43.011343001), (21, 43.011343001))
            ThreePointArc((21, 43.011343001), (22.75, 41.261343001), (21, 39.511343001))
            Line((21, 39.511343001), (32.341761046, 39.511343001))
        make_face()
        with BuildLine():
            ThreePointArc((14.341761046, 43.011343001), (12.591761046, 41.261343001), (14.341761046, 39.511343001))
            Line((14.341761046, 39.511343001), (21, 39.511343001))
            ThreePointArc((21, 39.511343001), (19.25, 41.261343001), (21, 43.011343001))
            Line((21, 43.011343001), (14.341761046, 43.011343001))
        make_face()
    extrude(amount=-CUT_EXTRUDE_17_DEPTH, mode=Mode.SUBTRACT)

    # 草图16 → 切除-拉伸19 (cut, through all)
    with BuildSketch(Plane(origin=(0, 0, 0), x_dir=(-1, 0, 0), z_dir=(0, 0, -1))):
        with BuildLine():
            Line((-62, 43.011343001), (-32, 43.011343001))
            ThreePointArc((-32, 43.011343001), (-30.25, 41.261343001), (-32, 39.511343001))
            Line((-32, 39.511343001), (-62, 39.511343001))
            ThreePointArc((-62, 39.511343001), (-63.75, 41.261343001), (-62, 43.011343001))
        make_face()
        with BuildLine():
            Line((62, 39.511343001), (32, 39.511343001))
            ThreePointArc((32, 39.511343001), (30.25, 41.261343001), (32, 43.011343001))
            Line((32, 43.011343001), (62, 43.011343001))
            ThreePointArc((62, 43.011343001), (63.75, 41.261343001), (62, 39.511343001))
        make_face()
    extrude(amount=-CUT_EXTRUDE_19_DEPTH, mode=Mode.SUBTRACT)

    # 草图26 → 切除-拉伸20 (cut, through all)
    with BuildSketch(Plane(origin=(0, 0, 0), x_dir=(-1, 0, 0), z_dir=(0, 0, -1))):
        with BuildLine():
            Line((15, 71.876956146), (-15, 71.876956146))
            ThreePointArc((-15, 71.876956146), (-20, 76.876956146), (-15, 81.876956146))
            Line((-15, 81.876956146), (15, 81.876956146))
            ThreePointArc((15, 81.876956146), (20, 76.876956146), (15, 71.876956146))
        make_face()
    extrude(amount=-CUT_EXTRUDE_20_DEPTH, mode=Mode.SUBTRACT)

    # 草图27 → 切除-拉伸21 (cut, through all)
    with BuildSketch(Plane(origin=(0, 0, 0), x_dir=(-1, 0, 0), z_dir=(0, 0, -1))):
        with BuildLine():
            Line((-10, -15.809971609), (-42.5, -15.809971609))
            ThreePointArc((-42.5, -15.809971609), (-44.25, -17.559971609), (-42.5, -19.309971609))
            Line((-42.5, -19.309971609), (-10, -19.309971609))
            ThreePointArc((-10, -19.309971609), (-8.25, -17.559971609), (-10, -15.809971609))
        make_face()
        with BuildLine():
            ThreePointArc((-42.5, 7.190028391), (-44.25, 5.440028391), (-42.5, 3.690028391))
            Line((-42.5, 3.690028391), (-10, 3.690028391))
            ThreePointArc((-10, 3.690028391), (-8.25, 5.440028391), (-10, 7.190028391))
            Line((-10, 7.190028391), (-42.5, 7.190028391))
        make_face()
        with BuildLine():
            Line((42.5, -15.809971609), (10, -15.809971609))
            ThreePointArc((10, -15.809971609), (8.25, -17.559971609), (10, -19.309971609))
            Line((10, -19.309971609), (42.5, -19.309971609))
            ThreePointArc((42.5, -19.309971609), (44.25, -17.559971609), (42.5, -15.809971609))
        make_face()
        with BuildLine():
            Line((42.5, 7.190028391), (10, 7.190028391))
            ThreePointArc((10, 7.190028391), (8.25, 5.440028391), (10, 3.690028391))
            Line((10, 3.690028391), (42.5, 3.690028391))
            ThreePointArc((42.5, 3.690028391), (44.25, 5.440028391), (42.5, 7.190028391))
        make_face()
    extrude(amount=-CUT_EXTRUDE_21_DEPTH, mode=Mode.SUBTRACT)

    # 草图28 → 切除-拉伸22 (cut, through all)
    with BuildSketch(Plane(origin=(0, 0, 0), x_dir=(-1, 0, 0), z_dir=(0, 0, -1))):
        with BuildLine():
            ThreePointArc((0, -48.812330529), (-7.86916468, -46.39674179), (-10.284753419, -54.26590647))
            ThreePointArc((-10.284753419, -54.26590647), (-5.977554294, -59.915955393), (0, -63.755729058))
            ThreePointArc((0, -63.755729058), (5.977554294, -59.915955393), (10.284753419, -54.26590647))
            ThreePointArc((10.284753419, -54.26590647), (7.86916468, -46.39674179), (0, -48.812330529))
        make_face()
    extrude(amount=-CUT_EXTRUDE_22_DEPTH, mode=Mode.SUBTRACT)

    # 草图29 → 切除-拉伸23 (cut)
    with BuildSketch(Plane(origin=(0, 0, 0), x_dir=(-1, 0, 0), z_dir=(0, 0, -1))):
        with BuildLine():
            ThreePointArc((-21.368709037, -73.490793052), (0, -84.713248851), (21.368709037, -73.490793052))
            ThreePointArc((21.368709037, -73.490793052), (23.760053677, -73.051240341), (24.199606389, -75.442584981))
            ThreePointArc((24.199606389, -75.442584981), (0, -88.151776376), (-24.199606389, -75.442584981))
            ThreePointArc((-24.199606389, -75.442584981), (-23.760053677, -73.051240341), (-21.368709037, -73.490793052))
        make_face()
    extrude(amount=-CUT_EXTRUDE_23_DEPTH, mode=Mode.SUBTRACT)


with BuildPart() as body_2:
    # 草图30 → 凸台-拉伸6 (new body)
    with BuildSketch(Plane(origin=(0, 0, -10), x_dir=(-1, 0, 0), z_dir=(0, 0, -1))):
        with BuildLine():
            Line((-12, 106.371786435), (-12, 141.664519159))
            Line((-12, 141.664519159), (12, 141.664519159))
            Line((12, 141.664519159), (12, 106.371786435))
            ThreePointArc((12, 106.371786435), (0, 94.371786435), (-12, 106.371786435))
        make_face()
        with Locations((8, 106.371786435)):
            Circle(SKETCH_30_R, mode=Mode.SUBTRACT)
        with Locations((0, 98.371786435)):
            Circle(SKETCH_30_R, mode=Mode.SUBTRACT)
        with Locations((-8, 106.371786435)):
            Circle(SKETCH_30_R, mode=Mode.SUBTRACT)
        with Locations((0, 114.371786435)):
            Circle(SKETCH_30_R, mode=Mode.SUBTRACT)
        with Locations((0, 106.371786435)):
            Circle(SKETCH_30_R_2, mode=Mode.SUBTRACT)
    extrude(amount=EXTRUDE_6_DEPTH)

    # 草图31 → 凸台-拉伸7 (add)
    with BuildSketch(Plane.ZY.offset(12)):
        Polygon((-10, 121.664519159), (15, 129.664519159), (18, 130.624519159), (18, 139.364328678), (15, 139.364328678), (15, 133.864328678), (-10, 125.864328678), align=None)
    extrude(amount=-EXTRUDE_7_DEPTH)

    # 草图32 → 切除-拉伸26 (cut)
    with BuildSketch(Plane.ZY.offset(12)):
        Polygon((-14, 124.584328678), (-10, 125.864328678), (-10, 141.664519159), (-14, 141.664519159), align=None)
    extrude(amount=-CUT_EXTRUDE_26_DEPTH, mode=Mode.SUBTRACT)

    # 草图34 → 凸台-拉伸8 (add)
    with BuildSketch(Plane(origin=(0, 139.364328678, 0), x_dir=(1, 0, 0), z_dir=(0, 1, 0))):
        Polygon((-12, -6), (-7, -18), (7, -18), (12, -6), (12, 14), (-12, 14), align=None)
    extrude(amount=EXTRUDE_8_DEPTH)

    # 草图36 → 凸台-拉伸9 (add)
    with BuildSketch(Plane(origin=(0, 137.364328678, 0), x_dir=(-1, 0, 0), z_dir=(0, -1, 0))):
        Polygon((-12, -6), (-8.25, -15), (8.25, -15), (12, -6), (12, 14), (-12, 14), align=None)
    extrude(amount=-EXTRUDE_9_DEPTH)

    # 草图37 → 切除-拉伸27 (cut)
    with BuildSketch(Plane(origin=(0, 149.364328678, 0), x_dir=(1, 0, 0), z_dir=(0, 1, 0))):
        Polygon((-12, 14), (-12, -6), (-7, -18), (7, -18), (12, -6), (12, 14), align=None)
    extrude(amount=-CUT_EXTRUDE_27_DEPTH, mode=Mode.SUBTRACT)

    # 草图38 → 切除-拉伸28 (cut, through all)
    with BuildSketch(Plane.ZY.offset(12)):
        with Locations((16.5, 138.864328678)):
            Rectangle(SKETCH_38_W, SKETCH_38_H)
    extrude(amount=-CUT_EXTRUDE_28_DEPTH, mode=Mode.SUBTRACT)

    # 草图39 → 切除-拉伸29 (cut)
    with BuildSketch(Plane(origin=(0, 138.364328678, 0), x_dir=(1, 0, 0), z_dir=(0, 1, 0))):
        Polygon((12, -6), (8.25, -15), (7, -18), (12, -18), align=None)
        Polygon((-8.25, -15), (-12, -6), (-12, -18), (-7, -18), align=None)
    extrude(amount=-CUT_EXTRUDE_29_DEPTH, mode=Mode.SUBTRACT)

    # 草图41 → 凸台-拉伸11 (add)
    with BuildSketch(Plane(origin=(0, 138.364328678, 0), x_dir=(1, 0, 0), z_dir=(0, 1, 0))):
        Polygon((-7, -18), (7, -18), (12, -6), (12, 14), (-12, 14), (-12, -6), align=None)
    extrude(amount=EXTRUDE_11_DEPTH)

    # 草图42 → 切除-拉伸30 (cut)
    with BuildSketch(Plane(origin=(0, 145.364328678, 0), x_dir=(1, 0, 0), z_dir=(0, 1, 0))):
        Polygon((-9.2, 14), (-9.2, 11.2), (-9.2, -5.44), (-5.133333333, -15.2), (-5.133333333, -18), (5.133333333, -18), (5.133333333, -15.2), (9.2, -5.44), (9.2, 11.2), (9.2, 14), align=None)
    extrude(amount=-CUT_EXTRUDE_30_DEPTH, mode=Mode.SUBTRACT)

    # 草图43 → 凸台-拉伸12 (add)
    with BuildSketch(Plane.ZY.offset(8.25)):
        Polygon((15, 137.364328678), (-14, 137.364328678), (-14, 124.584328678), (15, 133.864328678), align=None)
    extrude_12 = extrude(amount=-EXTRUDE_12_DEPTH)

    # 镜向1: 凸台-拉伸12 across plane
    add(extrude_12.mirror(Plane(origin=(0, 0, 0), x_dir=(0, 0, 1), z_dir=(1, 0, 0))))

    # 草图44 → 切除-拉伸31 (cut)
    with BuildSketch(Plane.ZY.offset(8.25)):
        Polygon((-11, 134.364328678), (6.719196439, 134.364328678), (-11, 128.694185818), align=None)
    extrude(amount=-CUT_EXTRUDE_31_DEPTH, mode=Mode.SUBTRACT)

    # 圆角4
    fillet_4_edges = [body_2.edges().sort_by_distance(p)[0] for p in [
        (-6.75, 134.364328678, 6.719196439),
        (6.75, 134.364328678, 6.719196439),
    ]]
    fillet(fillet_4_edges, radius=FILLET_4_R)

    # 圆角5
    fillet_5_edges = [body_2.edges().sort_by_distance(p)[0] for p in [
        (-6.75, 128.694185818, -11),
        (6.75, 128.694185818, -11),
    ]]
    fillet(fillet_5_edges, radius=FILLET_5_R)

    # 圆角6
    fillet_6_edges = [body_2.edges().sort_by_distance(p)[0] for p in [
        (-6.75, 134.364328678, -11),
        (6.75, 134.364328678, -11),
    ]]
    fillet(fillet_6_edges, radius=FILLET_6_R)

    # 草图45 → 切除-拉伸32 (cut)
    with BuildSketch(Plane(origin=(0, 139.864328678, 0), x_dir=(1, 0, 0), z_dir=(0, 1, 0))):
        with BuildLine():
            Line((3, -6), (3, 6))
            ThreePointArc((3, 6), (0, 9), (-3, 6))
            Line((-3, 6), (-3, -6))
            ThreePointArc((-3, -6), (0, -9), (3, -6))
        make_face()
    extrude(amount=-CUT_EXTRUDE_32_DEPTH, mode=Mode.SUBTRACT)

    # 草图47 → 切除-拉伸33 (cut, through all)
    with BuildSketch(Plane(origin=(0, 0, -14), x_dir=(-1, 0, 0), z_dir=(0, 0, -1))):
        with Locations((0, 144.864328678)):
            Rectangle(SKETCH_47_W, SKETCH_47_H)
    extrude(amount=-CUT_EXTRUDE_33_DEPTH, mode=Mode.SUBTRACT)

    # 草图48 → 凸台-拉伸13 (add)
    # profile 1 of 2: a face of its own
    with BuildSketch(Plane(origin=(0, 144.364328678, 0), x_dir=(1, 0, 0), z_dir=(0, 1, 0))):
        with Locations((-15, 0)):
            Rectangle(SKETCH_48_W, SKETCH_48_H)
        with Locations(Location((-15, 0, 0), (0, 0, 270))):
            Circle(SKETCH_48_R, mode=Mode.SUBTRACT)
    # profile 2 of 2: a face of its own
    with BuildSketch(Plane(origin=(0, 144.364328678, 0), x_dir=(1, 0, 0), z_dir=(0, 1, 0))):
        with Locations((15, 0)):
            Rectangle(SKETCH_48_W, SKETCH_48_H)
        with Locations(Location((15, 0, 0), (0, 0, 90))):
            Circle(SKETCH_48_R, mode=Mode.SUBTRACT)
    extrude(amount=-EXTRUDE_13_DEPTH)

    # 圆角7
    fillet_7_edges = [body_2.edges().sort_by_distance(p)[0] for p in [
        (-18, 142.864328678, 3.5),
        (-18, 142.864328678, -3.5),
        (-12, 142.864328678, -3.5),
        (-12, 142.864328678, 3.5),
        (18, 142.864328678, 3.5),
        (12, 142.864328678, 3.5),
        (12, 142.864328678, -3.5),
        (18, 142.864328678, -3.5),
    ]]
    fillet(fillet_7_edges, radius=FILLET_7_R)


with BuildPart() as body_3:
    # 镜向2: mirrored copy
    add(body_2.part.mirror(Plane.ZX.offset(148.364328678)))

    # 草图49 → 切除-拉伸34 (cut)
    with BuildSketch(Plane.ZY.offset(12)):
        with Locations((6.259442997, 182.307179246)):
            Rectangle(SKETCH_49_W, SKETCH_49_H)
    extrude(amount=-CUT_EXTRUDE_34_DEPTH, mode=Mode.SUBTRACT)

    # 圆角8
    fillet_8_edges = [body_3.edges().sort_by_distance(p)[0] for p in [
        (-12, 155.864328678, -14),
        (12, 155.864328678, -14),
        (7, 155.864328678, 18),
        (-7, 155.864328678, 18),
    ]]
    fillet(fillet_8_edges, radius=FILLET_8_R)

    # 圆角12
    fillet_12_edges = [body_3.edges().sort_by_distance(p)[0] for p in [
        (0, 156.864328678, 18),
    ]]
    fillet(fillet_12_edges, radius=FILLET_12_R)


with BuildPart() as body_2_1:
    add(body_2.part)

    # 圆角9
    fillet_9_edges = [body_2_1.edges().sort_by_distance(p)[0] for p in [
        (7, 137.494423918, 18),
        (-7, 137.494423918, 18),
    ]]
    fillet(fillet_9_edges, radius=FILLET_9_R)

    # 圆角10
    fillet_10_edges = [body_2_1.edges().sort_by_distance(p)[0] for p in [
        (-12, 140.864328678, -14),
        (12, 140.864328678, -14),
    ]]
    fillet(fillet_10_edges, radius=FILLET_10_R)

    # 圆角11
    fillet_11_edges = [body_2_1.edges().sort_by_distance(p)[0] for p in [
        (-10.125, 124.584328678, -14),
        (0, 124.584328678, -14),
        (10.125, 124.584328678, -14),
    ]]
    fillet(fillet_11_edges, radius=FILLET_11_R)

    # 圆角13
    fillet_13_edges = [body_2_1.edges().sort_by_distance(p)[0] for p in [
        (0, 139.864328678, 18),
    ]]
    fillet(fillet_13_edges, radius=FILLET_13_R)

    # 草图51 → 切除-拉伸36 (cut)
    with BuildSketch(Plane(origin=(0, 0, -14), x_dir=(-1, 0, 0), z_dir=(0, 0, -1))):
        with Locations((0.40334365, 119.025264365)):
            Rectangle(SKETCH_51_W, SKETCH_51_H)
    extrude(amount=-CUT_EXTRUDE_36_DEPTH, mode=Mode.SUBTRACT)


solid = body_3.part
